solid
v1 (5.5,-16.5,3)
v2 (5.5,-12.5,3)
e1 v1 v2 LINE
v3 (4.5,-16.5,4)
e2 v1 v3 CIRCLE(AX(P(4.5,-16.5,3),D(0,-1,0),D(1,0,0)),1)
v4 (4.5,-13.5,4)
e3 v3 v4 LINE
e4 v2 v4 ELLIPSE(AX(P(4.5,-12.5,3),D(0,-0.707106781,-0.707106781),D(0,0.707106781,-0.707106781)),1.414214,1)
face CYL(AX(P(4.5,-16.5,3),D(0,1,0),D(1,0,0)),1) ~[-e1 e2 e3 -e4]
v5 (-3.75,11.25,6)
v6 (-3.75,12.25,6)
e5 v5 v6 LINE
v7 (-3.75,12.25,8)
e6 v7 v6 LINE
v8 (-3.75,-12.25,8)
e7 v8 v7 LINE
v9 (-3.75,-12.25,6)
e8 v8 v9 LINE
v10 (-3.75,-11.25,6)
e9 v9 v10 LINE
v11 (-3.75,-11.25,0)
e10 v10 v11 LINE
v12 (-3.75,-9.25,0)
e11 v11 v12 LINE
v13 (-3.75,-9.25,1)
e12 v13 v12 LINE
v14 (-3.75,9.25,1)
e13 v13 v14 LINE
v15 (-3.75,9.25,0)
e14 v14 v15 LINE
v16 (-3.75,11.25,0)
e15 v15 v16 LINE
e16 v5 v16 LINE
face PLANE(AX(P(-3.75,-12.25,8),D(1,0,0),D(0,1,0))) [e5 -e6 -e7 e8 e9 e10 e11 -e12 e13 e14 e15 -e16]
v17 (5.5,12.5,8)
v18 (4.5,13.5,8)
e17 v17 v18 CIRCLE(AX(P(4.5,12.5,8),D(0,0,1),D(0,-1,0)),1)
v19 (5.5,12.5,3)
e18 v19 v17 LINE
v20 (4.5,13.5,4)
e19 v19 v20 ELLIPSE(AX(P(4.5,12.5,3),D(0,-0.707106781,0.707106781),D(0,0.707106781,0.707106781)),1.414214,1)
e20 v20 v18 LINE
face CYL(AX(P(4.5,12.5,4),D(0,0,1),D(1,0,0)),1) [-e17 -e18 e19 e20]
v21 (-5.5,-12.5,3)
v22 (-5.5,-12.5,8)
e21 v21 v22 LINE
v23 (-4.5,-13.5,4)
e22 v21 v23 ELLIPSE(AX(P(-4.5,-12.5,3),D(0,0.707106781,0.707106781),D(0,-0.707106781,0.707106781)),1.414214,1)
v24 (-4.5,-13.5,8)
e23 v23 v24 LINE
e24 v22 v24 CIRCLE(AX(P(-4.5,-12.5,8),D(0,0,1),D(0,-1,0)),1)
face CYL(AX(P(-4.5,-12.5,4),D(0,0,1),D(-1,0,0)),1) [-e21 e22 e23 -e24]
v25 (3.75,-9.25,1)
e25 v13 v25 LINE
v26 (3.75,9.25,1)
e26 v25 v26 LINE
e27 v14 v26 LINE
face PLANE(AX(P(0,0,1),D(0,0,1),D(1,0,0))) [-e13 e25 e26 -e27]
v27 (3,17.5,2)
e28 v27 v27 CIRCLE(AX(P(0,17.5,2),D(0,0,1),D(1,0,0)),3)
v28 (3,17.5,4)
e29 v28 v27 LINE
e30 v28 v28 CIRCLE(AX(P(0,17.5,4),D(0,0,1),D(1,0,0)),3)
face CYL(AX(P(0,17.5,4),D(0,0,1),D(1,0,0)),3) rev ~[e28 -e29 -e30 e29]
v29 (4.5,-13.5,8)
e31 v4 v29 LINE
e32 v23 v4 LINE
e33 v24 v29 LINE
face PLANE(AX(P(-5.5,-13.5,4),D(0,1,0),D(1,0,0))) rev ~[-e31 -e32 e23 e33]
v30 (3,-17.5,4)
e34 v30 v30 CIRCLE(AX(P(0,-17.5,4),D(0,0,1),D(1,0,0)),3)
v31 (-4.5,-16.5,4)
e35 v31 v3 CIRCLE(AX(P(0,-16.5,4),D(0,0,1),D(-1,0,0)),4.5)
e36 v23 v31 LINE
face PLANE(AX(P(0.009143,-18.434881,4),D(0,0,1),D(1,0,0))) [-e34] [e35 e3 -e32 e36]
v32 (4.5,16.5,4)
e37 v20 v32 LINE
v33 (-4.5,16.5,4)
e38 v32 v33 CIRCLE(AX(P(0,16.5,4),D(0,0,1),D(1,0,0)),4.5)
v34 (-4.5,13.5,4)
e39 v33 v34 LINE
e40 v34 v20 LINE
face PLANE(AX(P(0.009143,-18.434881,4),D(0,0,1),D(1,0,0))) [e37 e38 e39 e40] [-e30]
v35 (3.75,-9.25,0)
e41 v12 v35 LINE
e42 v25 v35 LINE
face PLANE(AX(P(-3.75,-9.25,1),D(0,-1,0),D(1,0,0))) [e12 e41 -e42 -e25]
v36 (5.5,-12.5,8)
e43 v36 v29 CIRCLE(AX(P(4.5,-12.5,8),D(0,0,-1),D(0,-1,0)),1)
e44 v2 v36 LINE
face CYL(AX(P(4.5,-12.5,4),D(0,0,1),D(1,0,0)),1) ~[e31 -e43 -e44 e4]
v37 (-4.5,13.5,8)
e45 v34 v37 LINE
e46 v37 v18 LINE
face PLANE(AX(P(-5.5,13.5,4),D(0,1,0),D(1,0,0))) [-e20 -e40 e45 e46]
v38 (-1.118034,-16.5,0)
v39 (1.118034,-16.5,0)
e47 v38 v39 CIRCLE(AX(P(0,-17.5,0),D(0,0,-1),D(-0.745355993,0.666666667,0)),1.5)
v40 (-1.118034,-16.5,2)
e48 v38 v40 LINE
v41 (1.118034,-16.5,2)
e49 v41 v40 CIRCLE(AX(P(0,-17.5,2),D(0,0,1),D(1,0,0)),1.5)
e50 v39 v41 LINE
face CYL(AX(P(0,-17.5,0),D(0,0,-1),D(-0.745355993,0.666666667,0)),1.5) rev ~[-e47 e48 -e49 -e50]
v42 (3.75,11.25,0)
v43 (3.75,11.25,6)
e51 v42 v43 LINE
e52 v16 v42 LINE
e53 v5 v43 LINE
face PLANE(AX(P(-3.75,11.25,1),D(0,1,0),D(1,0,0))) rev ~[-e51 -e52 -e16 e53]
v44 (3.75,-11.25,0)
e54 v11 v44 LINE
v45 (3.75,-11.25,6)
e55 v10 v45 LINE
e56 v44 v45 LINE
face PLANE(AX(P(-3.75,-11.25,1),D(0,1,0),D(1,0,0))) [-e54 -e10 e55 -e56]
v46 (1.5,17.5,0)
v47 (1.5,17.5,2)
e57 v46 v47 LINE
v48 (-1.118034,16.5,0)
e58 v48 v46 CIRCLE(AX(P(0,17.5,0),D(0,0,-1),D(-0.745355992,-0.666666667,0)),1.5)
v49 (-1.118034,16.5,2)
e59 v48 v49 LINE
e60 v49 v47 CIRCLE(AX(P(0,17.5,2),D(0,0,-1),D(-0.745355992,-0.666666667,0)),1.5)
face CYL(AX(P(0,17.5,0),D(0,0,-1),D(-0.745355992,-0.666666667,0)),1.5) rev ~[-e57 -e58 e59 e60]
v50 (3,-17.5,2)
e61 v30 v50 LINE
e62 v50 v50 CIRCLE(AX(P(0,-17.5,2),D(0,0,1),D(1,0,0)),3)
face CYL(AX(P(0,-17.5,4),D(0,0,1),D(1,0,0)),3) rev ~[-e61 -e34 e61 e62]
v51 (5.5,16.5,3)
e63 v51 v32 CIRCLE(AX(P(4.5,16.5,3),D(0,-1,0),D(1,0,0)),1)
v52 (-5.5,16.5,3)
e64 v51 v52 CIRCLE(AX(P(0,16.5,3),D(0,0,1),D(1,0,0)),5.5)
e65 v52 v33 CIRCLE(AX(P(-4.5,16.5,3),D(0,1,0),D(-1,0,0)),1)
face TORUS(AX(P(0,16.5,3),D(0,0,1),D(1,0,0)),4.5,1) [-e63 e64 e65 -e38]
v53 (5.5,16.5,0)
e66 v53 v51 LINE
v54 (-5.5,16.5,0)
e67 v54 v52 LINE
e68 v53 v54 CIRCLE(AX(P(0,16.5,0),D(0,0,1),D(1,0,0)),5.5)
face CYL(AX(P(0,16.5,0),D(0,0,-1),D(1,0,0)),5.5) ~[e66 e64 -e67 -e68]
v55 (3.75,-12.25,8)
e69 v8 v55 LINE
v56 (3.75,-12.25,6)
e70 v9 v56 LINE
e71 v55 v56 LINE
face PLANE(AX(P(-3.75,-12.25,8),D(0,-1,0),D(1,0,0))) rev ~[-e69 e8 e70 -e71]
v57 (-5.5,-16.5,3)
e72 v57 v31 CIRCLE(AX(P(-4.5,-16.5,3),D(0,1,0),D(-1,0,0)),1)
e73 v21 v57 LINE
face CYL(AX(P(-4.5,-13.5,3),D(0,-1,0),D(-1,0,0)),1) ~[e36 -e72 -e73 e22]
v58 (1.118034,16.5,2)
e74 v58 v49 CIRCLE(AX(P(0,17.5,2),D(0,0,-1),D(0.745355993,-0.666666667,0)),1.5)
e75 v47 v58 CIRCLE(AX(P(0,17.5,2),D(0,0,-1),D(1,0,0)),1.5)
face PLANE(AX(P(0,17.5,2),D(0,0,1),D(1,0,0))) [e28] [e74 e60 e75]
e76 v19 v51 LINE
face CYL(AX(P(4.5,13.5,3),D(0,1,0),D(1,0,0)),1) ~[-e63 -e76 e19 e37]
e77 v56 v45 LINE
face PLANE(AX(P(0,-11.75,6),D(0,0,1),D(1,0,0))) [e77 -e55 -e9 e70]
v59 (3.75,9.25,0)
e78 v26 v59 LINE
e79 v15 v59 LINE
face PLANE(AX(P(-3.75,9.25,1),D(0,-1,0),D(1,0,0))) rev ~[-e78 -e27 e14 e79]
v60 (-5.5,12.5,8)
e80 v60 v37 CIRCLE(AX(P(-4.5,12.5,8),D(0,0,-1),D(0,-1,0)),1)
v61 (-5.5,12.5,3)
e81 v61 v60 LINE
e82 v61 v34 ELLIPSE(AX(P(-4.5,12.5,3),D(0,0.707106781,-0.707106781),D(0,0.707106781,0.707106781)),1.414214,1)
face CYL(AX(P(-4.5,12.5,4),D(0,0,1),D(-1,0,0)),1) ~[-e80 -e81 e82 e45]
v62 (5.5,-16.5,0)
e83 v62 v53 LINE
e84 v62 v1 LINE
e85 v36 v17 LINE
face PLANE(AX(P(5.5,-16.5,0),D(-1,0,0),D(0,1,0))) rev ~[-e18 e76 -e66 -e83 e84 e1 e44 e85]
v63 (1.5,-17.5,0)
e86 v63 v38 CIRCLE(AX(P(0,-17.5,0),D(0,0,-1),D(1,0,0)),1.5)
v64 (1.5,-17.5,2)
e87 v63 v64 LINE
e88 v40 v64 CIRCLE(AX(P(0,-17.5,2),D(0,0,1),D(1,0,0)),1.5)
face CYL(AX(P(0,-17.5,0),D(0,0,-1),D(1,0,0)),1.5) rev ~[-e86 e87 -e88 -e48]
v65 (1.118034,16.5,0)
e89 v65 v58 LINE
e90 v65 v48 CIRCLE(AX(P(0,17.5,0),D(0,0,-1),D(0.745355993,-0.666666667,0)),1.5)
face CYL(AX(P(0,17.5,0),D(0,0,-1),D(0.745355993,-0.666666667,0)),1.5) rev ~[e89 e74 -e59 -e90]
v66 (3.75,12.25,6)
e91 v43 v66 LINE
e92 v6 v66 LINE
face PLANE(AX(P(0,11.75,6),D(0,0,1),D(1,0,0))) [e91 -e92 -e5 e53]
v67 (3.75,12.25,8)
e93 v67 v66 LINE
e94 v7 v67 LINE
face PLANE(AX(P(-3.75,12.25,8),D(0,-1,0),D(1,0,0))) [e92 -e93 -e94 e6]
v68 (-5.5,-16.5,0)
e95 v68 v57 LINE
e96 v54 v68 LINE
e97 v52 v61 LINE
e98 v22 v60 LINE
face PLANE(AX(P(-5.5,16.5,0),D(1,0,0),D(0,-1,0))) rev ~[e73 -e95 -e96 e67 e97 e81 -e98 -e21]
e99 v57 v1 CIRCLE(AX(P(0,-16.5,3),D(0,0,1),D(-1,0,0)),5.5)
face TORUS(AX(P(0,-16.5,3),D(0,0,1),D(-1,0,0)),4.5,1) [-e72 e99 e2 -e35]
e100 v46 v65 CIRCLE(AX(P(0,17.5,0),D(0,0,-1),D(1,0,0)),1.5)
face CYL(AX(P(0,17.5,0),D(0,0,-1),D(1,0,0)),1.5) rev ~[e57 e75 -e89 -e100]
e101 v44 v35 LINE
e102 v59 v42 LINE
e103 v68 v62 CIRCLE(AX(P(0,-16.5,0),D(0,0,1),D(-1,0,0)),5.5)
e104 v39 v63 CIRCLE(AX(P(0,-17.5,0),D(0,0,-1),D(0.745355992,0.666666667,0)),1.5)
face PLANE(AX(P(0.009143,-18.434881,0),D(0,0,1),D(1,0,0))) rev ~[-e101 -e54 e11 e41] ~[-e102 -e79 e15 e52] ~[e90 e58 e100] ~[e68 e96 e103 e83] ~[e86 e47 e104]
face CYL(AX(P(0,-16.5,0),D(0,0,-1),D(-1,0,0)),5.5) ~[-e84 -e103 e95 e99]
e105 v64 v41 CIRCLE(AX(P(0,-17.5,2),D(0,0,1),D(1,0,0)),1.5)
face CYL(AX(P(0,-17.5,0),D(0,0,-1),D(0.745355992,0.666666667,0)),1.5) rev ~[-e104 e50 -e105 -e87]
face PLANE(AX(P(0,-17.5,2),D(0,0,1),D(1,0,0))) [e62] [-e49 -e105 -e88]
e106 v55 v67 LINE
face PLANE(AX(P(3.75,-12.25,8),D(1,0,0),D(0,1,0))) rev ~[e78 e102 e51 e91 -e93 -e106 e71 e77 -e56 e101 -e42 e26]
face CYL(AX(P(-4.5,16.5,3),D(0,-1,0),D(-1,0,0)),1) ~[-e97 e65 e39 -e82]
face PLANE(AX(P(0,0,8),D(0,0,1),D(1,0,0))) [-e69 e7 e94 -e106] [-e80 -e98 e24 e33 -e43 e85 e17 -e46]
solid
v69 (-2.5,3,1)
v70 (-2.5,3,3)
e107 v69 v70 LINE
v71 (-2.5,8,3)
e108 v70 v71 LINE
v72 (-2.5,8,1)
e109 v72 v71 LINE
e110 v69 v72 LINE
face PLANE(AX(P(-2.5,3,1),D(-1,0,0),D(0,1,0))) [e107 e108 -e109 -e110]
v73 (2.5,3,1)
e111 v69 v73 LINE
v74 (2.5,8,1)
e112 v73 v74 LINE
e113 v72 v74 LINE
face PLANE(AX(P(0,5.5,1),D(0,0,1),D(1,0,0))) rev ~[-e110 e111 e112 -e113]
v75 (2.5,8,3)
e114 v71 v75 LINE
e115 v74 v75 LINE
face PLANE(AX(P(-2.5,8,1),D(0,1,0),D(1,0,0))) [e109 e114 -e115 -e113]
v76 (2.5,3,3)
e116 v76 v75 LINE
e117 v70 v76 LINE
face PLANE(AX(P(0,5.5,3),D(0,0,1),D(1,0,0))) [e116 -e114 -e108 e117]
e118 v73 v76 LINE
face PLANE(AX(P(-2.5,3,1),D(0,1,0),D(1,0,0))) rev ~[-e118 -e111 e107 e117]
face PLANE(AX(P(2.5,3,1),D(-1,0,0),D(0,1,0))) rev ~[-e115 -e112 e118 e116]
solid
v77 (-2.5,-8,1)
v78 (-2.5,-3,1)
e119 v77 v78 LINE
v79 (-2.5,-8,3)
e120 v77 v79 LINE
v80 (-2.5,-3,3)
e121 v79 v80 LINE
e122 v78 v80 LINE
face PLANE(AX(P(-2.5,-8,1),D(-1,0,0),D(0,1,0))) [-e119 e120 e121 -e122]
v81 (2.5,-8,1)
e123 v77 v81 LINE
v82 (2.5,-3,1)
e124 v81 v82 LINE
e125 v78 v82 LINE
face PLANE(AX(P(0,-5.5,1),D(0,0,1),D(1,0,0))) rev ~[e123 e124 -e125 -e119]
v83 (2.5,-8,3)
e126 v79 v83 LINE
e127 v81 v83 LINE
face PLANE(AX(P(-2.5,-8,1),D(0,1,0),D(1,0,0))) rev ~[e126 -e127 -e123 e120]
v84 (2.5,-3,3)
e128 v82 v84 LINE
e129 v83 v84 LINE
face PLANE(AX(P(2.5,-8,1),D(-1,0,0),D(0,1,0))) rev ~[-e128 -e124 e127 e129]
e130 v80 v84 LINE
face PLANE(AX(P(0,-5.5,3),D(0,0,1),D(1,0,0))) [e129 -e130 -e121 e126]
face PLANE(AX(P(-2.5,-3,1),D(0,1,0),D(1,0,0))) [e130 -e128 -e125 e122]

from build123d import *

# Parameters (mm, degrees)
F1_DEPTH  = 4
F2_W      = 11
F2_H      = 27
F3_DEPTH  = 4
F4_W      = 7.5
F4_H      = 24.5
F5_DEPTH  = 7
F6_W      = 7.5
F6_H      = 1
F7_DEPTH  = 5
F8_W      = 7.5
F8_H      = 2
F9_DEPTH  = 25
F10_W     = 5
F10_H     = 5
F11_DEPTH = 2
F12_R     = 3
F12_R_2   = 1.5
F13_DEPTH = 2
F14_R     = 1


# Not quite as in the source:
# - a feature names something its author has since deleted; it is built from what else it names


with BuildPart() as f1:
    # F0 (on Top) → F1 (new body)
    with BuildSketch(Plane.XY):
        with BuildLine():
            ThreePointArc((-5.5, -16.5), (0, -22), (5.5, -16.5))
            Line((5.5, -16.5), (1.1180339887, -16.5))
            ThreePointArc((1.1180339887, -16.5), (1.4012585384, -16.9647668653), (1.5, -17.5))
            ThreePointArc((1.5, -17.5), (-0.5352331347, -18.9012585384), (-1.1180339887, -16.5))
            Line((-1.1180339887, -16.5), (-5.5, -16.5))
        make_face()
        with BuildLine():
            Line((1.1180339887, -16.5), (5.5, -16.5))
            Line((5.5, -16.5), (5.5, 16.5))
            Line((5.5, 16.5), (1.1180339887, 16.5))
            ThreePointArc((1.1180339887, 16.5), (0, 16), (-1.1180339887, 16.5))
            Line((-1.1180339887, 16.5), (-5.5, 16.5))
            Line((-5.5, 16.5), (-5.5, -16.5))
            Line((-5.5, -16.5), (-1.1180339887, -16.5))
            ThreePointArc((-1.1180339887, -16.5), (0, -16), (1.1180339887, -16.5))
        make_face()
        with BuildLine():
            Line((1.1180339887, 16.5), (5.5, 16.5))
            ThreePointArc((5.5, 16.5), (0, 22), (-5.5, 16.5))
            Line((-5.5, 16.5), (-1.1180339887, 16.5))
            ThreePointArc((-1.1180339887, 16.5), (-0.5352331347, 18.9012585384), (1.5, 17.5))
            ThreePointArc((1.5, 17.5), (1.4012585384, 16.9647668653), (1.1180339887, 16.5))
        make_face()
    extrude(amount=F1_DEPTH)

    # F2 (on face) → F3 (join)
    with BuildSketch(Plane.XY.offset(4)):
        Rectangle(F2_W, F2_H)
    extrude(amount=F3_DEPTH)

    # F4 (on face) → F5 (cut)
    with BuildSketch(Plane.XY.offset(8)):
        Rectangle(F4_W, F4_H)
    extrude(amount=-F5_DEPTH, mode=Mode.SUBTRACT)

    # F6 (on face) → F7 (join)
    with BuildSketch(Plane.XY.offset(1)):
        with Locations((0, 11.75)):
            Rectangle(F6_W, F6_H)
        with Locations((0, -11.75)):
            Rectangle(F6_W, F6_H)
    extrude(amount=F7_DEPTH)

    # F8 (on face) → F9 (cut)
    with BuildSketch(Plane.XY.offset(1)):
        with Locations((0, 10.25)):
            Rectangle(F8_W, F8_H)
        with Locations((0, -10.25)):
            Rectangle(F8_W, F8_H)
    extrude(amount=-F9_DEPTH, mode=Mode.SUBTRACT)

    # F12 (on face) → F13 (cut)
    with BuildSketch(Plane.XY.offset(4)):
        with Locations((0, 17.5)):
            Circle(F12_R)
        with Locations((0, -17.5)):
            Circle(F12_R)
        with Locations((0, -17.5)):
            Circle(F12_R_2, mode=Mode.SUBTRACT)
    extrude(amount=-F13_DEPTH, mode=Mode.SUBTRACT)

    # F14
    f14_edges = [f1.edges().sort_by_distance(p)[0] for p in [
        (0, -22, 4),
        (-5.5, -13.5, 6),
        (5.5, -13.5, 6),
        (5.5, 13.5, 6),
        (-5.5, 13.5, 6),
        (0, 22, 4),
    ]]
    fillet(f14_edges, radius=F14_R)


with BuildPart() as f11:
    # F10 (on face) → F11 (new body)
    with BuildSketch(Plane.XY.offset(1)):
        with Locations((0, 5.5)):
            Rectangle(F10_W, F10_H)
    extrude(amount=F11_DEPTH)


with BuildPart() as f11b:
    # F10 (on face) → F11, piece 2 (new body)
    with BuildSketch(Plane.XY.offset(1)):
        with Locations((0, -5.5)):
            Rectangle(F10_W, F10_H)
    extrude(amount=F11_DEPTH)


solid = Compound([f1.part, f11.part, f11b.part])
